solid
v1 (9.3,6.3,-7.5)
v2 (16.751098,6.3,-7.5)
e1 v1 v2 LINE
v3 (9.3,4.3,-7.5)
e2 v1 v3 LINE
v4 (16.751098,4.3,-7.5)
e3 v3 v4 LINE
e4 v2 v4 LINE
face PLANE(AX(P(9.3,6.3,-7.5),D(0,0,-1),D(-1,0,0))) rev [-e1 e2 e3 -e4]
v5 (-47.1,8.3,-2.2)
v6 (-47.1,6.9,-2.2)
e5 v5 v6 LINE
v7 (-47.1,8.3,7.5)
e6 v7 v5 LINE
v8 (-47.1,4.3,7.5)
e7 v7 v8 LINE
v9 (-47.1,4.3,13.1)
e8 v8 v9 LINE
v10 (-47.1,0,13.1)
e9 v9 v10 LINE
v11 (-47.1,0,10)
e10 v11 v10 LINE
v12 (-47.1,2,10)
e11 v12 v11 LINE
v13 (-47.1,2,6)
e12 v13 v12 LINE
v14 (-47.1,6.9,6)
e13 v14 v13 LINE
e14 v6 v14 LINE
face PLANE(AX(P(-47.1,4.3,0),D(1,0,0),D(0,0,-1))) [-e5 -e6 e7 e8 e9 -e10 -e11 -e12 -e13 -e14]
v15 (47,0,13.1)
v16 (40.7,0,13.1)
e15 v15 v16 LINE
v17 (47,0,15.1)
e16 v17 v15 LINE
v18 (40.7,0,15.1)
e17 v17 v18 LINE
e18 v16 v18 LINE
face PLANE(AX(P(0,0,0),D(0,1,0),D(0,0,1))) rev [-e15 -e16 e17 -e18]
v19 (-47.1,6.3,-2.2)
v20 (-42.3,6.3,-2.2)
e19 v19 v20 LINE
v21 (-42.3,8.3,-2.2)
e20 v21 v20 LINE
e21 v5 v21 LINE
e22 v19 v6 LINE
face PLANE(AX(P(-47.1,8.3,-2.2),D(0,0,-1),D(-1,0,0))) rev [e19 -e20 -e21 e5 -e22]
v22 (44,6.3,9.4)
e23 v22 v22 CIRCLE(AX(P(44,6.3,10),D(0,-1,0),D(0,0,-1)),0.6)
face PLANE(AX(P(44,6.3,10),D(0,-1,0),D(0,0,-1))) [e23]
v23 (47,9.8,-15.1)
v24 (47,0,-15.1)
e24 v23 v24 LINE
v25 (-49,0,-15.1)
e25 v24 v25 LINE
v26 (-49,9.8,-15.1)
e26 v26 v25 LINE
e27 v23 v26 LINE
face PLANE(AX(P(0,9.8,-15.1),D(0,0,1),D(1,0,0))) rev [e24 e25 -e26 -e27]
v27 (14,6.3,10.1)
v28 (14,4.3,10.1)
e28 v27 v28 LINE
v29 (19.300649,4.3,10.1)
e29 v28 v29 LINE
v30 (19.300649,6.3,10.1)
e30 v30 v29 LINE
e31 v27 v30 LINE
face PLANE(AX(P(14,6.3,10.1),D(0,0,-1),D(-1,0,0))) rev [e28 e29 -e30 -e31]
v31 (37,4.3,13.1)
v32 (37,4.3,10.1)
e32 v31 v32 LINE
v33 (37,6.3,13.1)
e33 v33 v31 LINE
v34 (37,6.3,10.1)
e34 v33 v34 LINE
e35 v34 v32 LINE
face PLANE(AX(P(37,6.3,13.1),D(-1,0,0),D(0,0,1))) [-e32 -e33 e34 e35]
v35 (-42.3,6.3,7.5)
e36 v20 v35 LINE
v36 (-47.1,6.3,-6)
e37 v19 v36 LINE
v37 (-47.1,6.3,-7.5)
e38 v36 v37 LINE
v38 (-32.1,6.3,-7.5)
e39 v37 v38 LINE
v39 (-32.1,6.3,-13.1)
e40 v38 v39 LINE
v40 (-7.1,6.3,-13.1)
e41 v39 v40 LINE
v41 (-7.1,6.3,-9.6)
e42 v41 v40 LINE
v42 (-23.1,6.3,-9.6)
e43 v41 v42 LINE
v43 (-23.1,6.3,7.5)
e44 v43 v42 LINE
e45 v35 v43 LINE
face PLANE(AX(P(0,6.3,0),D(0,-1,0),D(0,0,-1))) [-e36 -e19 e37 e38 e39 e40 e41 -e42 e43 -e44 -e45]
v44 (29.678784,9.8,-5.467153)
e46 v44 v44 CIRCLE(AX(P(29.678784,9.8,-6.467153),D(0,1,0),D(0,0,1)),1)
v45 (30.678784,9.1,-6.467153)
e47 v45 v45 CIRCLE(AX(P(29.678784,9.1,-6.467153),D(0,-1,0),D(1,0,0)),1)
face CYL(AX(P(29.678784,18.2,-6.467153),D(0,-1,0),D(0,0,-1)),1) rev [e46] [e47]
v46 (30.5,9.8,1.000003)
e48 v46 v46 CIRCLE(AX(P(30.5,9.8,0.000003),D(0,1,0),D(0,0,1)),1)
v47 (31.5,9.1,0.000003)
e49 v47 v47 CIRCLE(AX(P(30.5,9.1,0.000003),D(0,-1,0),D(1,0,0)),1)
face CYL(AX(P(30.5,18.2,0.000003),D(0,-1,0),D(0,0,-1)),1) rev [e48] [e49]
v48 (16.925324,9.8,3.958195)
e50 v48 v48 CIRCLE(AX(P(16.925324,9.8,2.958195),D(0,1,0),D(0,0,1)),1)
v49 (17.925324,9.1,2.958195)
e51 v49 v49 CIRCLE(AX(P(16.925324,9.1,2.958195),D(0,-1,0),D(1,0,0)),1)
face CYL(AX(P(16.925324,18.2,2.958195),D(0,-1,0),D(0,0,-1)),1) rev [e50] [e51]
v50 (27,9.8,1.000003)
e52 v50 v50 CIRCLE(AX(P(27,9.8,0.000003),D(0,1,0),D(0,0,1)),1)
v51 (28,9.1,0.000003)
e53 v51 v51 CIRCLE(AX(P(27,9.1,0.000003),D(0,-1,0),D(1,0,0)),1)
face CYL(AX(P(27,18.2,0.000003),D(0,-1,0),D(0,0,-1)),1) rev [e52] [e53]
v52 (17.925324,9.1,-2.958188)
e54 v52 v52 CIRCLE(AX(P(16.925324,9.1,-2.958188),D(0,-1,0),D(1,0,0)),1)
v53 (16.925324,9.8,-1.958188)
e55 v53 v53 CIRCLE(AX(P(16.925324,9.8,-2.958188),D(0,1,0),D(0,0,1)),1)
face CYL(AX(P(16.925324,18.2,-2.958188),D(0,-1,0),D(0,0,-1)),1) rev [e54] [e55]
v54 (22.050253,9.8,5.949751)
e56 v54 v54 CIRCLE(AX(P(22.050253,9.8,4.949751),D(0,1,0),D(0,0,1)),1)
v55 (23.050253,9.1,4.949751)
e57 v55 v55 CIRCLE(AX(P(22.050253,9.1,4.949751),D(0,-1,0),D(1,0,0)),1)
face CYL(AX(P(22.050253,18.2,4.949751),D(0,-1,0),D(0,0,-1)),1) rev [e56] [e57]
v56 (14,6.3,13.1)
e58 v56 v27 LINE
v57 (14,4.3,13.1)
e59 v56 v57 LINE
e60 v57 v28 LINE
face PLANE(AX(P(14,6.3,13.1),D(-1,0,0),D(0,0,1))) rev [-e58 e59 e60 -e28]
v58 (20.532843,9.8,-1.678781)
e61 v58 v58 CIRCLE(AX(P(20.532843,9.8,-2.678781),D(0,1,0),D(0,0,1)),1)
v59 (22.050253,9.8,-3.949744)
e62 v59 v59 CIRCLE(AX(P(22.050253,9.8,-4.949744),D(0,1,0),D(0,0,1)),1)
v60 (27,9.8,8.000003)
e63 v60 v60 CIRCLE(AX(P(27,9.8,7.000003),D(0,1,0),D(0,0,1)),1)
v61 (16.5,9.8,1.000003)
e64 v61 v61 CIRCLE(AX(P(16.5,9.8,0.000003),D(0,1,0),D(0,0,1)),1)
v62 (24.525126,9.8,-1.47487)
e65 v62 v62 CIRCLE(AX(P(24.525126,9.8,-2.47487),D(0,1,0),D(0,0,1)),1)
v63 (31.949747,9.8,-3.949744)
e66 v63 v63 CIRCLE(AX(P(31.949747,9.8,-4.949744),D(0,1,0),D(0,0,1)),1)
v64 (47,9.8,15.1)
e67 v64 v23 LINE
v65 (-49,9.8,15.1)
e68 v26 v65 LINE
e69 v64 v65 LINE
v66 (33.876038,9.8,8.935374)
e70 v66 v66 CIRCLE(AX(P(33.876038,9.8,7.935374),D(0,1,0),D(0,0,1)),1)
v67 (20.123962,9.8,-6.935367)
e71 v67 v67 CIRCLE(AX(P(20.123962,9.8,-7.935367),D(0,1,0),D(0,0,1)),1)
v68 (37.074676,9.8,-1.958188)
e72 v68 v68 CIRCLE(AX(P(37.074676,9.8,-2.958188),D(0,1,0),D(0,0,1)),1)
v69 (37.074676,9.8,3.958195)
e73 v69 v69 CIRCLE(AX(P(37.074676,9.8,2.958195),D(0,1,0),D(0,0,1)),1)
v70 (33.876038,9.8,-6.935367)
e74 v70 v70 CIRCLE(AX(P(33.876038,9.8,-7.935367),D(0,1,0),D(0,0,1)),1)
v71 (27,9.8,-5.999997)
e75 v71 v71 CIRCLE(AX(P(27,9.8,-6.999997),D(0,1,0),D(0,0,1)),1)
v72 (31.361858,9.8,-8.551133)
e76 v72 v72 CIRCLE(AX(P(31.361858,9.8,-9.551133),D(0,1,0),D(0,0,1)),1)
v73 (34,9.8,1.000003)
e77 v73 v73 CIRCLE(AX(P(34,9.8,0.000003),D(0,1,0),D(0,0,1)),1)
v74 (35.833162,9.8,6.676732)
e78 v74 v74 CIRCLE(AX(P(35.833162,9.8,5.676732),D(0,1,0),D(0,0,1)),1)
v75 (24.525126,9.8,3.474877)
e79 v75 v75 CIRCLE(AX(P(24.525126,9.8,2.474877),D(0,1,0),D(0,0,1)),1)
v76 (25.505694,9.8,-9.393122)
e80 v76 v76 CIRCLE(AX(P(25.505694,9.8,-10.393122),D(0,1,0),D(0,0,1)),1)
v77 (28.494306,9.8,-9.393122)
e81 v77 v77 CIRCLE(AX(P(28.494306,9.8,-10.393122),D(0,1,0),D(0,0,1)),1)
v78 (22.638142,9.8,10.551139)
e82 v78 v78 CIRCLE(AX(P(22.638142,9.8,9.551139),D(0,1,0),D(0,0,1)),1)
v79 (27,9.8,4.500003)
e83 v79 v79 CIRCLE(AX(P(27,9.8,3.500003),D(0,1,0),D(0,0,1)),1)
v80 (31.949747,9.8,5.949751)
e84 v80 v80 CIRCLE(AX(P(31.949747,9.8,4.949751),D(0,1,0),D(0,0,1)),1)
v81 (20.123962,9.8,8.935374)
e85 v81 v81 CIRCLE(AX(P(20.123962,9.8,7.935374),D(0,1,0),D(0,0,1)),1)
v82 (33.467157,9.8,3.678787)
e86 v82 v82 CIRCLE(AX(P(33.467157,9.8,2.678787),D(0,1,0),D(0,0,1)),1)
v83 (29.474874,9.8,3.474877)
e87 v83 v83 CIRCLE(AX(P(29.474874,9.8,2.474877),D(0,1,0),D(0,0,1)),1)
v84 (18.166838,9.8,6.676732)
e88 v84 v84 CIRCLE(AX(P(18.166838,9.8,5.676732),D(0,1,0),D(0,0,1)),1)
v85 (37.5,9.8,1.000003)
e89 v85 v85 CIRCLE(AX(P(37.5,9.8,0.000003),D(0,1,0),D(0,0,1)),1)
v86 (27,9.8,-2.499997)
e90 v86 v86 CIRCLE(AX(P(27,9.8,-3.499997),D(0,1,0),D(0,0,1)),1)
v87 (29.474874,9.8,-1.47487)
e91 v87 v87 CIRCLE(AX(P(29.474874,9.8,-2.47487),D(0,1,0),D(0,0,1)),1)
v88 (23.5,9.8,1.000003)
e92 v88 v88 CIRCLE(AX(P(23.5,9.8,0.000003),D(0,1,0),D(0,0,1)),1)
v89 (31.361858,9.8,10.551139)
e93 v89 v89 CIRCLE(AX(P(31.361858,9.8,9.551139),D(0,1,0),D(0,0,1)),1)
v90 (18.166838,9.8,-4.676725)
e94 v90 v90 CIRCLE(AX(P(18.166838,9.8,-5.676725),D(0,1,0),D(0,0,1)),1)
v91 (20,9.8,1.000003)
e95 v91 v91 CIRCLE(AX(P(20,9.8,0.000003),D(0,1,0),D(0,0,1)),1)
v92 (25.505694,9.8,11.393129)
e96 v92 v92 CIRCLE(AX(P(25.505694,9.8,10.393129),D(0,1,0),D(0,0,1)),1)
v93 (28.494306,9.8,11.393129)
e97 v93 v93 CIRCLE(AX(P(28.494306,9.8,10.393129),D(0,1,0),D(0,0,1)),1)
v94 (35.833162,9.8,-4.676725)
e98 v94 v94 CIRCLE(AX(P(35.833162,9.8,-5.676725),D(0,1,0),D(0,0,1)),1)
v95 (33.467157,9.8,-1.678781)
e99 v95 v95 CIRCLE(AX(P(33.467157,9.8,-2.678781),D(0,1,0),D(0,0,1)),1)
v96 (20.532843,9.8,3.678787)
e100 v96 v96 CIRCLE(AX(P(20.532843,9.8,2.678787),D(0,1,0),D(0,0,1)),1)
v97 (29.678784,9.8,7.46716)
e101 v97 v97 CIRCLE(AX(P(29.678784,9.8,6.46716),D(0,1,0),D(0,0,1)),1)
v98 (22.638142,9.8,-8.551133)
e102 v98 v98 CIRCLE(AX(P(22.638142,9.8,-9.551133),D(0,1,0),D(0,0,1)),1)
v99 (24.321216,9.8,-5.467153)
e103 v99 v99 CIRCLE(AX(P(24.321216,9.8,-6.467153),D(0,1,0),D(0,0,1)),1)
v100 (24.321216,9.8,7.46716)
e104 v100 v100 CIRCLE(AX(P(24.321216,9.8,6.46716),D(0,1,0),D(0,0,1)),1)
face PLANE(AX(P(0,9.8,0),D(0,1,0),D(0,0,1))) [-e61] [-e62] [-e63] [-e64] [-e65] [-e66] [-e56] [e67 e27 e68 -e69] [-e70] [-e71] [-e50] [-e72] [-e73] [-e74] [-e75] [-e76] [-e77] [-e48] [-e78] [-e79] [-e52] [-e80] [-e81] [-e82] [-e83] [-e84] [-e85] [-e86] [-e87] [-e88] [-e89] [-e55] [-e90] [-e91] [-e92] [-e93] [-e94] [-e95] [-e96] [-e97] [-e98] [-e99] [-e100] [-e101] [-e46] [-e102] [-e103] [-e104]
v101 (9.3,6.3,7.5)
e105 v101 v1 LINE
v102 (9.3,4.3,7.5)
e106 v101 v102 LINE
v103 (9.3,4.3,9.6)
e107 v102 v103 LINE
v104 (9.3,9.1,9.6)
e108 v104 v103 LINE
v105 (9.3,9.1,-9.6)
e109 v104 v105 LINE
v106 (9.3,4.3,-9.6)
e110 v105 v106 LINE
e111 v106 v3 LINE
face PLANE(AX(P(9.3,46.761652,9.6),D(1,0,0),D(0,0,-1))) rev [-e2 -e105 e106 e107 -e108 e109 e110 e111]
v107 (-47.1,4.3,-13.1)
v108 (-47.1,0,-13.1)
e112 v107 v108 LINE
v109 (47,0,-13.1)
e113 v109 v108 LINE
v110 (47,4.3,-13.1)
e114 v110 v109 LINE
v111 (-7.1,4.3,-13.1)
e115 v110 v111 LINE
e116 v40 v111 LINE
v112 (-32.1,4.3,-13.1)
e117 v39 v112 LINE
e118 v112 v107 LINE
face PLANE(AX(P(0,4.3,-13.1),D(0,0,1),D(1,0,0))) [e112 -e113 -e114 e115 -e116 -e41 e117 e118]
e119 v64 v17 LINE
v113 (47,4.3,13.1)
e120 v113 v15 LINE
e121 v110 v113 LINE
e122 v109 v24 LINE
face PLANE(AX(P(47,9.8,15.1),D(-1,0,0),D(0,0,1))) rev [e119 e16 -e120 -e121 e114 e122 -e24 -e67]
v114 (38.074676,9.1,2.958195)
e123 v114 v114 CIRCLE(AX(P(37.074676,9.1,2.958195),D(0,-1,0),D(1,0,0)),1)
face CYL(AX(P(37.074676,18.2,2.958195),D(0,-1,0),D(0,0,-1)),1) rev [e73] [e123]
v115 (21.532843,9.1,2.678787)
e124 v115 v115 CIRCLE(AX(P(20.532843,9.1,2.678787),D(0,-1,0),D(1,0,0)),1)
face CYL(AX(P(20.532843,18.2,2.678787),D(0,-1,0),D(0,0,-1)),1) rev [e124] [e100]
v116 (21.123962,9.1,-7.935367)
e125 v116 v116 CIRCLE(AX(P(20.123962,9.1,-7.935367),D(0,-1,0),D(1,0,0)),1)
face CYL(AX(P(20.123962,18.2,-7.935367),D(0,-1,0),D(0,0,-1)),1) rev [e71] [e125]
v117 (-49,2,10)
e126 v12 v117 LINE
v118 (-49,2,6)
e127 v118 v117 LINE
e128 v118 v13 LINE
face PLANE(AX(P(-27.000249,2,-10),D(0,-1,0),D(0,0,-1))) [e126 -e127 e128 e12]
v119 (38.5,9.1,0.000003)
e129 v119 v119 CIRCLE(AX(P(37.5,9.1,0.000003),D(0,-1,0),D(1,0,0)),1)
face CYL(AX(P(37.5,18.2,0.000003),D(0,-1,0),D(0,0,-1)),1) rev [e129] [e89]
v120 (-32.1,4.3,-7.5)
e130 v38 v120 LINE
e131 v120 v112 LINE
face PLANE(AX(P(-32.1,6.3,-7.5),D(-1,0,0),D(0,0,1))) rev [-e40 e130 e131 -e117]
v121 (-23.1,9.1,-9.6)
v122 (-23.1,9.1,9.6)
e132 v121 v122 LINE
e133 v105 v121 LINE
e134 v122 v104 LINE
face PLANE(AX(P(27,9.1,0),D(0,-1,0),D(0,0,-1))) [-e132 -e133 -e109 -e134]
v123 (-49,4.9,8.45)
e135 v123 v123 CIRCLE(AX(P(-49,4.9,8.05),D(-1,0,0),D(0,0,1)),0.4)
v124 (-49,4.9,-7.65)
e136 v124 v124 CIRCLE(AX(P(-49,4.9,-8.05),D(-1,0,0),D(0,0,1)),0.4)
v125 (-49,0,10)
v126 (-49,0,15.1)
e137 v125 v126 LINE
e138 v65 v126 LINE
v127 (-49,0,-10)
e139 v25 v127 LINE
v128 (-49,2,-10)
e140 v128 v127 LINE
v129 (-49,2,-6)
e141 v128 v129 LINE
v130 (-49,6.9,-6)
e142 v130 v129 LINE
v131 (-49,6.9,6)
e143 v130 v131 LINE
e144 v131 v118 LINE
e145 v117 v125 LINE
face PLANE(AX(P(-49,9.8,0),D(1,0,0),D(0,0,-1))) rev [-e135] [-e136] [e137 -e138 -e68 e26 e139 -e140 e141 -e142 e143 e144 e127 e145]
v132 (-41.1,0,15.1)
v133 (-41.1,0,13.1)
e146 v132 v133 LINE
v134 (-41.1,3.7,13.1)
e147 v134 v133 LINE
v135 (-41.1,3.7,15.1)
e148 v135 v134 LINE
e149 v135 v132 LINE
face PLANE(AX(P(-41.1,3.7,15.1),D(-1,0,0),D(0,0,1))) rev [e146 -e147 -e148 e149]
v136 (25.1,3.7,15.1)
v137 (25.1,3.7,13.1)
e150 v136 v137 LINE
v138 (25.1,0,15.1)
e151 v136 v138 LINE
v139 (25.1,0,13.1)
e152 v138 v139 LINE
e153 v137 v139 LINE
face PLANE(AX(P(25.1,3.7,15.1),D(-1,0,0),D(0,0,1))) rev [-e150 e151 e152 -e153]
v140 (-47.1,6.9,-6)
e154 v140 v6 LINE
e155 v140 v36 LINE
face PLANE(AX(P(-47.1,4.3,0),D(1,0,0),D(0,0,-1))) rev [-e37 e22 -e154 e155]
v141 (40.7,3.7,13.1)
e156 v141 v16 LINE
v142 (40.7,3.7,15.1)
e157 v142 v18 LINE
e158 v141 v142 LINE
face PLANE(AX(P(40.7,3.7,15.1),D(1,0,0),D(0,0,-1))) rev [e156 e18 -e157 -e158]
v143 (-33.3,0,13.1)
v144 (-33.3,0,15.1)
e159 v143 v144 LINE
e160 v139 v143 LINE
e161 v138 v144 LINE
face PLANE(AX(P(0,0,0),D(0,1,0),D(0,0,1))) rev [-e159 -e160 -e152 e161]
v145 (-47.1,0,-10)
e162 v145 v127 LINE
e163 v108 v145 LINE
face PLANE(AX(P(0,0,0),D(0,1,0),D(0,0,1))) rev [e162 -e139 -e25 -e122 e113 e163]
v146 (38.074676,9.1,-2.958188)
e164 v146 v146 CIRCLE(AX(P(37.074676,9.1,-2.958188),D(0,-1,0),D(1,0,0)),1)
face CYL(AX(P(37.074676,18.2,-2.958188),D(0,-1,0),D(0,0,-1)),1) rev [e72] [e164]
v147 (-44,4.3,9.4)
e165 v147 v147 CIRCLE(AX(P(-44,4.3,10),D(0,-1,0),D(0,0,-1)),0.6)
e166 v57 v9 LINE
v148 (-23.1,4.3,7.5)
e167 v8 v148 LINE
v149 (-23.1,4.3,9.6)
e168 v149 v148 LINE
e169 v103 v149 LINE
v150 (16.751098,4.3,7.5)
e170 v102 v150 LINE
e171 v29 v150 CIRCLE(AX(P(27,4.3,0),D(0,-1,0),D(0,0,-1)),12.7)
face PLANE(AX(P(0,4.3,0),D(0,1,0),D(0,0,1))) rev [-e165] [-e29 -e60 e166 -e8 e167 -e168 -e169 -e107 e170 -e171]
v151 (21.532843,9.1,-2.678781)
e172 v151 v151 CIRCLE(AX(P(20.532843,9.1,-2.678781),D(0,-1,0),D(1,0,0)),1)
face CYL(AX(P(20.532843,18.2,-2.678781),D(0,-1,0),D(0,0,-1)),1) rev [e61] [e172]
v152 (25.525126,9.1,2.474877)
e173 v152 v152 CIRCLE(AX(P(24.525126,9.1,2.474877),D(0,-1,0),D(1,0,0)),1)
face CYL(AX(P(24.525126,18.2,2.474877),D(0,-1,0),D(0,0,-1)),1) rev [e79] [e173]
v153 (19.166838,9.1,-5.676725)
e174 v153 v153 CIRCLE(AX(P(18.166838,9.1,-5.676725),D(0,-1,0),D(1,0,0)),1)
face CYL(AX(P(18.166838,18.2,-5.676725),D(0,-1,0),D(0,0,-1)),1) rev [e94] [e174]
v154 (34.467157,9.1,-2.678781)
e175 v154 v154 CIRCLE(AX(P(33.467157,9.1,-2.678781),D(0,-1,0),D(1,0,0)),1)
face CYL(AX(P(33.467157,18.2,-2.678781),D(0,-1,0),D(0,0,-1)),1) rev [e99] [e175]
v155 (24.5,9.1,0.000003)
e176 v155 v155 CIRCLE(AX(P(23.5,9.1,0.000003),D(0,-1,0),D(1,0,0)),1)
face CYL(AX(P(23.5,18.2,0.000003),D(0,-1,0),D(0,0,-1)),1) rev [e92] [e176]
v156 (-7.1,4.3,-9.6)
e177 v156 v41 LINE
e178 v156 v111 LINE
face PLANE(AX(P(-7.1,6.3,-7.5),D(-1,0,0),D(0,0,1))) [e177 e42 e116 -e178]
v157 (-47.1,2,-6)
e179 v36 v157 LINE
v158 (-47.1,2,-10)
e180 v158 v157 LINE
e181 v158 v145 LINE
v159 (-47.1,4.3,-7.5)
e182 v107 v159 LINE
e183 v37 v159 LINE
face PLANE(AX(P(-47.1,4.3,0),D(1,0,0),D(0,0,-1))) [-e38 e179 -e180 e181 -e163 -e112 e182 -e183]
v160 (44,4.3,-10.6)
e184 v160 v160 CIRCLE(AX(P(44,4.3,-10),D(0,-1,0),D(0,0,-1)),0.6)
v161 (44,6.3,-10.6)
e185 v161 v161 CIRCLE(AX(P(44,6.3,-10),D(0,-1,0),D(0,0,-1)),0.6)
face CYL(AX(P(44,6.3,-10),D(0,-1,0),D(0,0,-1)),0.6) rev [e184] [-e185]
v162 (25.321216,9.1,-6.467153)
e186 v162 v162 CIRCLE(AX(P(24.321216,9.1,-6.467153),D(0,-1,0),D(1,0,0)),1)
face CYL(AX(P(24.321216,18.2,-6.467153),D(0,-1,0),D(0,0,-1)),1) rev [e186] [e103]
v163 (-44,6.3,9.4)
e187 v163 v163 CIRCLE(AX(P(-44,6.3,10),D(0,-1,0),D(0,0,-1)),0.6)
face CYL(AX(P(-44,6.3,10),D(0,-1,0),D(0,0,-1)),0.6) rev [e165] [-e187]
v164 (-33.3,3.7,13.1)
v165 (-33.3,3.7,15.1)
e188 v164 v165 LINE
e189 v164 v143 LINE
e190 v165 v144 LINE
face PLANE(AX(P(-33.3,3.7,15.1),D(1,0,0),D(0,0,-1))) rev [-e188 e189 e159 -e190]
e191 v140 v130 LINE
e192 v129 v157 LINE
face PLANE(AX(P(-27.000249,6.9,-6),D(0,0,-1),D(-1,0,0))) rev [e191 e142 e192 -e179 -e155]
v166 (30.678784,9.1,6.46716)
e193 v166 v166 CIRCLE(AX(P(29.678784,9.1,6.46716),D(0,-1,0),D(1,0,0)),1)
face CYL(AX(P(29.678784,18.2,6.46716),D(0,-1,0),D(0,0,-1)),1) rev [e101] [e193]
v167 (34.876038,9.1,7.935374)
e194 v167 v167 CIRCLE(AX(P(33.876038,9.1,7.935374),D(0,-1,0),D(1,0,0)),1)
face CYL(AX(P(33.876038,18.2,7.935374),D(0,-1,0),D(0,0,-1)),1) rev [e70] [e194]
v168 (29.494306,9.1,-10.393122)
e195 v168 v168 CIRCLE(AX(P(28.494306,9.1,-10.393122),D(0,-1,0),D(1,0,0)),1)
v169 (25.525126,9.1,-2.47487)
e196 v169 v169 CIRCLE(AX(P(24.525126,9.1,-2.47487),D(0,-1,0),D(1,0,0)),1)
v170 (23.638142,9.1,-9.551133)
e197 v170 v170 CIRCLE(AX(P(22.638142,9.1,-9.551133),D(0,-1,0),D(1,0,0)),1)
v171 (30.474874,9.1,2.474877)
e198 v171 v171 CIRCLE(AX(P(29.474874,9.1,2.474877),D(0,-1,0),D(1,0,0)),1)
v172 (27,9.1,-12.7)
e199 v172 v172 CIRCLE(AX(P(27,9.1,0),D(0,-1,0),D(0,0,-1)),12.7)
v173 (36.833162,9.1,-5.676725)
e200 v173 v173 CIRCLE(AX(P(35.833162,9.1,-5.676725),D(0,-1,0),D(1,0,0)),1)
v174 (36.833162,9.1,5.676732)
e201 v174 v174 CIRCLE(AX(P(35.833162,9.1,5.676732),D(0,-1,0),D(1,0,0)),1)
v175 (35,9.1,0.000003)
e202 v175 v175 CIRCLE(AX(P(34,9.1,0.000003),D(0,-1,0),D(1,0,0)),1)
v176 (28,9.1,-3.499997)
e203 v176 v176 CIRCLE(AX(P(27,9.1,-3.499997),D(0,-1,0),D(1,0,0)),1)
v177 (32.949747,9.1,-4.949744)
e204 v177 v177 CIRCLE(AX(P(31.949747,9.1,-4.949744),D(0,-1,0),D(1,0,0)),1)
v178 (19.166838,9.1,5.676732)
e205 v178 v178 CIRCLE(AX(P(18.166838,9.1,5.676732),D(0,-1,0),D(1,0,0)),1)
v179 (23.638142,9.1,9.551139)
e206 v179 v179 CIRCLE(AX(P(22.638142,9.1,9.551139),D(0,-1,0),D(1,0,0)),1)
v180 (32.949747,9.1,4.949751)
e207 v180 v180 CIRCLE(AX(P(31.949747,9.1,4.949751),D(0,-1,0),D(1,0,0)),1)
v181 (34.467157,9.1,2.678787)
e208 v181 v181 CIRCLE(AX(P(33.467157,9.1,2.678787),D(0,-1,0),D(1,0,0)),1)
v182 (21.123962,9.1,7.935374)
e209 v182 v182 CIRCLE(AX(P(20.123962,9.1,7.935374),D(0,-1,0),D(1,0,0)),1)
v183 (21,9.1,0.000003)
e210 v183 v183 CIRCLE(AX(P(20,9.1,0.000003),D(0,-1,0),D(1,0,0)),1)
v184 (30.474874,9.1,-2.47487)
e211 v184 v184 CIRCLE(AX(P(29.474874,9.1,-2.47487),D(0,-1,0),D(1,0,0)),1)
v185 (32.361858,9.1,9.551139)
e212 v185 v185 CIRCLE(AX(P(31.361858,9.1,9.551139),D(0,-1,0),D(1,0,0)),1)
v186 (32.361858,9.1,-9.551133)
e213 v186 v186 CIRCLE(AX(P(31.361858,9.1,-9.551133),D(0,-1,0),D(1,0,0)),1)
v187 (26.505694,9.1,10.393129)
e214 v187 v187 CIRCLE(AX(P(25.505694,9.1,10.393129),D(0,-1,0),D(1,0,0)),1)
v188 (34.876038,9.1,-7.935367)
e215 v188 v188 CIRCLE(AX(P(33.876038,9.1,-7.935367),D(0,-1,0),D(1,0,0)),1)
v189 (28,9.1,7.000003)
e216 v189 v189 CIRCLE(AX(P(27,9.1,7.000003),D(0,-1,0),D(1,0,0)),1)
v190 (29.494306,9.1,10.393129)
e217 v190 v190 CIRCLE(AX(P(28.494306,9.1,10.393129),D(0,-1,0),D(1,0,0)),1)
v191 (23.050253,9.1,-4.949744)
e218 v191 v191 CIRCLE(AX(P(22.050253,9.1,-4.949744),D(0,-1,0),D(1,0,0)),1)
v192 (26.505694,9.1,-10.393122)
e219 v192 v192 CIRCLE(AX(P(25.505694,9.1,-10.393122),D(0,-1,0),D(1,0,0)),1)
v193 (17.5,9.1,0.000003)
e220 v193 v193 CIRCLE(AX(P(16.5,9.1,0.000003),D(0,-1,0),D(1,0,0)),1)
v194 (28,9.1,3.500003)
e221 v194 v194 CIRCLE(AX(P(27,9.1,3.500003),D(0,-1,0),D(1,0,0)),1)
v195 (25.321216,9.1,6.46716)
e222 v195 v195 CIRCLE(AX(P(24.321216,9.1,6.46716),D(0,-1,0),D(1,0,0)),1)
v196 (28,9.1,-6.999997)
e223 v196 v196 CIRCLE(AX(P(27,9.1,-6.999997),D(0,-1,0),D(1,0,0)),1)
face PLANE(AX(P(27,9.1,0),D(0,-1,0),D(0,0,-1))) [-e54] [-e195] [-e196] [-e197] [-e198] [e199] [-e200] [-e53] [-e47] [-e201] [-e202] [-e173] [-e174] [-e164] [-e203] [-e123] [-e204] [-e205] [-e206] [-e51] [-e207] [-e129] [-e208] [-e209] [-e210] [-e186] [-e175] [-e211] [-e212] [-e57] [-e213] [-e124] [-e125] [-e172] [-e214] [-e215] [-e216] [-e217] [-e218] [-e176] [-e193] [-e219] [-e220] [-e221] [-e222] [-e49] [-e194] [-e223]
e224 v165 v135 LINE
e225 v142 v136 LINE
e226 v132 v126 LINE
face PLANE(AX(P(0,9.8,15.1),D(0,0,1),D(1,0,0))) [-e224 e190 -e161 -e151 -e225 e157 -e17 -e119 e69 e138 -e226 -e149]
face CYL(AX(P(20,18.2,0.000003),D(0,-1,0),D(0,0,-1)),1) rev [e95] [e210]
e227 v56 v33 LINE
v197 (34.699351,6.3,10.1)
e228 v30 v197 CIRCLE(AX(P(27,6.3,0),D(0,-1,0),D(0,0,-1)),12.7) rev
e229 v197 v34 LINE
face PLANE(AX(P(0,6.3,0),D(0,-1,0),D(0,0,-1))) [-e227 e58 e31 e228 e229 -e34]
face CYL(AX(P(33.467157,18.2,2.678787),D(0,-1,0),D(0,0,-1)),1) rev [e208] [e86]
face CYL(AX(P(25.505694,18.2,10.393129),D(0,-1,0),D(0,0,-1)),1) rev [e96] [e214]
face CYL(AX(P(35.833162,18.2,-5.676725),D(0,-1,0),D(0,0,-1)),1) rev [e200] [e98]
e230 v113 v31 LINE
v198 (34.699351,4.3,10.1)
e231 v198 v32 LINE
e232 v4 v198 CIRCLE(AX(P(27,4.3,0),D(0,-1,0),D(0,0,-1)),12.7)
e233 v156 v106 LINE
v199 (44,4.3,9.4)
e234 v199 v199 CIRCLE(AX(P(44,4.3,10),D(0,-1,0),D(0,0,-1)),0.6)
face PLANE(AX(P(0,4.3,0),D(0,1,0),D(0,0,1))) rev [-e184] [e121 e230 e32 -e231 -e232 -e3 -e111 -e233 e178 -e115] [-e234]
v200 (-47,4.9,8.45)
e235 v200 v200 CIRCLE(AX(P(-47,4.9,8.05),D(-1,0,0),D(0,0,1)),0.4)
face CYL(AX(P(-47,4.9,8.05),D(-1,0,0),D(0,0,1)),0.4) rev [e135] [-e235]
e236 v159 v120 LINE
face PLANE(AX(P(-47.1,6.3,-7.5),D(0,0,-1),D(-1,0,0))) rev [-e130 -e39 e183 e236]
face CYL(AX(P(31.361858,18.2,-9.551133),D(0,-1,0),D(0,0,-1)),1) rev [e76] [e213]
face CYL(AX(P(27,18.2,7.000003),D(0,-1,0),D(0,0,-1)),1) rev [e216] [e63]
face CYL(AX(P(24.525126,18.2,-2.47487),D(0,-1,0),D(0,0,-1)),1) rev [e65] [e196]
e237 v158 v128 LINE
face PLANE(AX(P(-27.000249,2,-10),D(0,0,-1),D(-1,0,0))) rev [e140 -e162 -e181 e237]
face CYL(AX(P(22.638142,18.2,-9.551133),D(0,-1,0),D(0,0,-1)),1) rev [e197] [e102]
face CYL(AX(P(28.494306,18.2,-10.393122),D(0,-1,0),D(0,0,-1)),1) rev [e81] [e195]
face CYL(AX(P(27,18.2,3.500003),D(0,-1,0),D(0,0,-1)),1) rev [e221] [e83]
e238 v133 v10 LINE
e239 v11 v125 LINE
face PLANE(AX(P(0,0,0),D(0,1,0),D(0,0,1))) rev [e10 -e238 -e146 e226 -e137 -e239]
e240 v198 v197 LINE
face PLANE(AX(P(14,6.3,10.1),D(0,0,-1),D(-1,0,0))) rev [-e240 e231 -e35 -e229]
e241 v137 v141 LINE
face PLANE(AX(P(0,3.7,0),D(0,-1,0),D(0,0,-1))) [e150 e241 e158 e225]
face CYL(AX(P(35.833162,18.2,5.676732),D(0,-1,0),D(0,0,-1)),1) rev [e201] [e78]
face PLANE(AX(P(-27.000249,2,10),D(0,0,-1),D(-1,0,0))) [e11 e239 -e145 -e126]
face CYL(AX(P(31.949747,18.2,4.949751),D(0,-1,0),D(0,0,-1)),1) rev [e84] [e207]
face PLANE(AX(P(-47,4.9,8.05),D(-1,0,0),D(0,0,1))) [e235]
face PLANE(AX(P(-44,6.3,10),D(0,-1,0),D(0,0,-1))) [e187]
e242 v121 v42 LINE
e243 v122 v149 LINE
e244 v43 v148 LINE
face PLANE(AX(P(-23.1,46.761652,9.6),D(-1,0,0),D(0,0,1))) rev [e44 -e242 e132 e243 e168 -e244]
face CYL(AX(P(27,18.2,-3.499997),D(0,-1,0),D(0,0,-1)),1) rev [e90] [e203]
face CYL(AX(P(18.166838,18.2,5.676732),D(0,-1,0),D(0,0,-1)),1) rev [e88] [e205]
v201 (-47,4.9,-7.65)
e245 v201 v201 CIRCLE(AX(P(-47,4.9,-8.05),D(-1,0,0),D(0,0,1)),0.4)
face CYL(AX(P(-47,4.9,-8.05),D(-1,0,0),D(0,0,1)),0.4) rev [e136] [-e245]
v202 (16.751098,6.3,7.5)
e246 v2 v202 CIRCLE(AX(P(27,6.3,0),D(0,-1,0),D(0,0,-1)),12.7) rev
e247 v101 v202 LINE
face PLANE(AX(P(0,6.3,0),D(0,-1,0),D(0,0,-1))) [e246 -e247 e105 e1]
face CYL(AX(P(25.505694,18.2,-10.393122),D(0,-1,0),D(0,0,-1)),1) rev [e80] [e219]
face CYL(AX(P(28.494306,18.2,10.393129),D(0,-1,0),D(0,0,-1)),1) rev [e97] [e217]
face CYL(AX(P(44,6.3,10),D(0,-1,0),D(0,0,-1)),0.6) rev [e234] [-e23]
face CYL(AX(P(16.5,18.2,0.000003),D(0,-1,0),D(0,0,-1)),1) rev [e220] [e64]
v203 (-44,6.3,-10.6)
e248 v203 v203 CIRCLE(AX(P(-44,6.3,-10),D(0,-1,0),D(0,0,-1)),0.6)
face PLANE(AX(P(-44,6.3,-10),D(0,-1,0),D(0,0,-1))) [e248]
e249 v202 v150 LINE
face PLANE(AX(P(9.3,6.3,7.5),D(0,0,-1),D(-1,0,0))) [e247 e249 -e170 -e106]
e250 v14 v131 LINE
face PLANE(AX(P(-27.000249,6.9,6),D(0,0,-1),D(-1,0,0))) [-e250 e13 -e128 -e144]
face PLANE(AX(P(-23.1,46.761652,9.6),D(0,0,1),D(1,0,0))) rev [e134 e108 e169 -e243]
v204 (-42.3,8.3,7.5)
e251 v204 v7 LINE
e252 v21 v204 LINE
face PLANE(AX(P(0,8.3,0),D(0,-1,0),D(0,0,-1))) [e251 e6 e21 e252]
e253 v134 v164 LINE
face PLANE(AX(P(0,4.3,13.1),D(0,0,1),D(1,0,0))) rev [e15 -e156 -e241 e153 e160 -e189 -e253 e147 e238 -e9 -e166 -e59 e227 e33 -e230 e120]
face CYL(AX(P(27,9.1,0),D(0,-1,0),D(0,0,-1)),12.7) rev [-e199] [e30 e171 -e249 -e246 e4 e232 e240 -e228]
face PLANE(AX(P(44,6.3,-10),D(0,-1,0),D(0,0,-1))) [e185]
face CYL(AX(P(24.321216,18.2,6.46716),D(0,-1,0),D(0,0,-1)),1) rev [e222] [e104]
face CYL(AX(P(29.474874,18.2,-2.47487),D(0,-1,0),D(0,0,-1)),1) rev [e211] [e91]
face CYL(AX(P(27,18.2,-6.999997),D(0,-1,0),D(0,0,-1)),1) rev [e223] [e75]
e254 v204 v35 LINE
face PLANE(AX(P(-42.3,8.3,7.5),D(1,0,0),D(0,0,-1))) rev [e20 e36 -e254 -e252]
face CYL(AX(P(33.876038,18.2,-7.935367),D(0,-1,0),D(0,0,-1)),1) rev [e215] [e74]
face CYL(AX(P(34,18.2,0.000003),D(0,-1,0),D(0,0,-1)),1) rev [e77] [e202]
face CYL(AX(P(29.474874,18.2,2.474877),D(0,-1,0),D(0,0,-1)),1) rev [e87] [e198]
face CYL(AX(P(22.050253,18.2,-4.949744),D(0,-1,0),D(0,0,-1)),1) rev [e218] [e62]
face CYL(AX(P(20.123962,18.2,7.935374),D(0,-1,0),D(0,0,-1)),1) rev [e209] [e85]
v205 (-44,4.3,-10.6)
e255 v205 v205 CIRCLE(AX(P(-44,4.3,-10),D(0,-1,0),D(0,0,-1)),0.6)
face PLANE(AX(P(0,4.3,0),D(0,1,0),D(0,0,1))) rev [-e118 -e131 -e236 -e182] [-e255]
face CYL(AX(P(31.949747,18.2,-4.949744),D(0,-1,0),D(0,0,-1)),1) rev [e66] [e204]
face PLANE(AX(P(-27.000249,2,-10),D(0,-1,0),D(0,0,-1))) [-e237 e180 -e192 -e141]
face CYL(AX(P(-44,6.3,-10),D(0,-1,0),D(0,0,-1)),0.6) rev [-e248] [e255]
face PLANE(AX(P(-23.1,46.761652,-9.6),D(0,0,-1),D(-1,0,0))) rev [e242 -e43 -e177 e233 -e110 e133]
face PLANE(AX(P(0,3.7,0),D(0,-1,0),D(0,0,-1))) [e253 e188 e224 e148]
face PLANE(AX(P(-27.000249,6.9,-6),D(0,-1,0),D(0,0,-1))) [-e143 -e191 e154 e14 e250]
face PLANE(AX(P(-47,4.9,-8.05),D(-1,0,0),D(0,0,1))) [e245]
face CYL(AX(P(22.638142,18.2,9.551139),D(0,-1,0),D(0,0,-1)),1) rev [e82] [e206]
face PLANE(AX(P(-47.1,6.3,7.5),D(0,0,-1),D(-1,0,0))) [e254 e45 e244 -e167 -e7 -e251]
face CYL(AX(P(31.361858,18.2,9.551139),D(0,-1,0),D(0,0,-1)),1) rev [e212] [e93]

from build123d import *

# Parameters (mm, degrees)
SKETCH_1_W           = 96
SKETCH_1_H           = 30.2
EXTRUDE_1_DEPTH      = 9.8
SKETCH_1_8_W         = 0.1
SKETCH_1_8_H         = 26.2
SKETCH_1_8_W_2       = 94
CUT_EXTRUDE_2_DEPTH  = 4.3
SKETCH_2_R           = 12.7
CUT_EXTRUDE_3_DEPTH  = 4.8
SKETCH_3_W           = 32.4
SKETCH_3_H           = 19.2
CUT_EXTRUDE_4_DEPTH  = 4.8
SKETCH_4_R           = 0.6
CUT_EXTRUDE_5_DEPTH  = 2
SKETCH_5_W           = 7.8
SKETCH_5_H           = 2
SKETCH_5_W_2         = 15.6
CUT_EXTRUDE_6_DEPTH  = 3.7
SKETCH_6_R           = 0.4
CUT_EXTRUDE_7_DEPTH  = 2
SKETCH_7_W           = 12
SKETCH_7_H           = 6.9
SKETCH_7_W_2         = 20
SKETCH_7_H_2         = 2
CUT_EXTRUDE_9_DEPTH  = 1.9
SKETCH_8_W           = 4.8
SKETCH_8_H           = 9.7
CUT_EXTRUDE_10_DEPTH = 2
OTHER_START          = 9.1
OTHER_1_OUTLINE_R    = 1
OTHER_1_DEPTH        = 0.7


# Read off the part's stored shape, not the designer's step: 填充阵列1
with BuildPart() as part:
    # 草图1 → 凸台-拉伸1 (new body)
    with BuildSketch(Plane(origin=(0, 0, 0), x_dir=(1, 0, 0), z_dir=(0, 1, 0))):
        with Locations((-1, 0)):
            Rectangle(SKETCH_1_W, SKETCH_1_H)
    extrude(amount=EXTRUDE_1_DEPTH)

    # 草图1<8> → 切除-拉伸2 (cut)
    with BuildSketch(Plane(origin=(0, 0, 0), x_dir=(1, 0, 0), z_dir=(0, 1, 0))):
        with Locations((-47.05, 0)):
            Rectangle(SKETCH_1_8_W, SKETCH_1_8_H)
        Rectangle(SKETCH_1_8_W_2, SKETCH_1_8_H)
    extrude(amount=CUT_EXTRUDE_2_DEPTH, mode=Mode.SUBTRACT)

    # 草图2 → 切除-拉伸3 (cut)
    with BuildSketch(Plane(origin=(0, 4.3, 0), x_dir=(-1, 0, 0), z_dir=(0, -1, 0))):
        with Locations(Location((-27, 0, 0), (0, 0, 90))):
            Circle(SKETCH_2_R)
    extrude(amount=-CUT_EXTRUDE_3_DEPTH, mode=Mode.SUBTRACT)

    # 草图3 → 切除-拉伸4 (cut)
    with BuildSketch(Plane.XZ.offset(-4.3)):
        with Locations((-6.9, 0)):
            Rectangle(SKETCH_3_W, SKETCH_3_H)
    extrude(amount=-CUT_EXTRUDE_4_DEPTH, mode=Mode.SUBTRACT)

    # 草图4 → 切除-拉伸5 (cut)
    with BuildSketch(Plane.XZ.offset(-4.3)):
        Polygon((-23.1, 7.5), (-47.1, 7.5), (-47.1, -7.5), (-32.1, -7.5), (-32.1, -13.1), (-7.1, -13.1), (-7.1, -9.6), (-23.1, -9.6), align=None)
        with BuildLine():
            Line((37, 13.1), (14, 13.1))
            Line((14, 13.1), (14, 10.1))
            Line((14, 10.1), (19.300649378, 10.1))
            ThreePointArc((19.300649378, 10.1), (27, 12.7), (34.699350622, 10.1))
            Line((34.699350622, 10.1), (37, 10.1))
            Line((37, 10.1), (37, 13.1))
        make_face()
        with BuildLine():
            Line((16.75109762, 7.5), (9.3, 7.5))
            Line((9.3, 7.5), (9.3, -7.5))
            Line((9.3, -7.5), (16.75109762, -7.5))
            ThreePointArc((16.75109762, -7.5), (14.3, 0), (16.75109762, 7.5))
        make_face()
        with Locations(Location((-44, 10, 0), (0, 0, 270))):
            Circle(SKETCH_4_R)
        with Locations(Location((-44, -10, 0), (0, 0, 270))):
            Circle(SKETCH_4_R)
        with Locations(Location((44, 10, 0), (0, 0, 270))):
            Circle(SKETCH_4_R)
        with Locations(Location((44, -10, 0), (0, 0, 270))):
            Circle(SKETCH_4_R)
    extrude(amount=-CUT_EXTRUDE_5_DEPTH, mode=Mode.SUBTRACT)

    # 草图5 → 切除-拉伸6 (cut)
    with BuildSketch(Plane.XZ):
        with Locations((-37.2, 14.1)):
            Rectangle(SKETCH_5_W, SKETCH_5_H)
        with Locations((32.9, 14.1)):
            Rectangle(SKETCH_5_W_2, SKETCH_5_H)
    extrude(amount=-CUT_EXTRUDE_6_DEPTH, mode=Mode.SUBTRACT)

    # 草图6 → 切除-拉伸7 (cut)
    with BuildSketch(Plane.ZY.offset(49)):
        with Locations((-8.05, 4.9)):
            Circle(SKETCH_6_R)
        with Locations((8.05, 4.9)):
            Circle(SKETCH_6_R)
    extrude(amount=-CUT_EXTRUDE_7_DEPTH, mode=Mode.SUBTRACT)

    # 草图7 → 切除-拉伸9 (cut)
    with BuildSketch(Plane.ZY.offset(49)):
        with Locations((0, 3.45)):
            Rectangle(SKETCH_7_W, SKETCH_7_H)
        with Locations((0, 1)):
            Rectangle(SKETCH_7_W_2, SKETCH_7_H_2)
    extrude(amount=-CUT_EXTRUDE_9_DEPTH, mode=Mode.SUBTRACT)

    # 草图8 → 切除-拉伸10 (cut)
    with BuildSketch(Plane.XZ.offset(-6.3)):
        with Locations((-44.7, 2.65)):
            Rectangle(SKETCH_8_W, SKETCH_8_H)
    extrude(amount=-CUT_EXTRUDE_10_DEPTH, mode=Mode.SUBTRACT)

    # 填充阵列1 outline → 填充阵列1 (cut)
    with BuildSketch(Plane(origin=(0, 0, 0), x_dir=(1, 0, 0), z_dir=(0, 1, 0)).offset(OTHER_START)):
        with Locations((27, -3.369e-06)):
            Circle(OTHER_1_OUTLINE_R)
        with Locations((22.050252532, 4.949744099)):
            Circle(OTHER_1_OUTLINE_R)
        with Locations((33.876037706, 7.935367161)):
            Circle(OTHER_1_OUTLINE_R)
        with Locations((20.532843272, 2.678780657)):
            Circle(OTHER_1_OUTLINE_R)
        with Locations((31.361857637, 9.551132582)):
            Circle(OTHER_1_OUTLINE_R)
        with Locations((27, 6.999996631)):
            Circle(OTHER_1_OUTLINE_R)
        with Locations((37.074676223, 2.958188477)):
            Circle(OTHER_1_OUTLINE_R)
        with Locations((24.321215973, 6.467153358)):
            Circle(OTHER_1_OUTLINE_R)
        with Locations((35.833162095, 5.676725214)):
            Circle(OTHER_1_OUTLINE_R)
        with Locations((28.494305802, 10.39312177)):
            Circle(OTHER_1_OUTLINE_R)
        with Locations((25.505694198, 10.39312177)):
            Circle(OTHER_1_OUTLINE_R)
        with Locations((22.638142363, 9.551132582)):
            Circle(OTHER_1_OUTLINE_R)
        with Locations((20.123962294, 7.935367161)):
            Circle(OTHER_1_OUTLINE_R)
        with Locations((18.166837905, 5.676725214)):
            Circle(OTHER_1_OUTLINE_R)
        with Locations((16.925323777, 2.958188477)):
            Circle(OTHER_1_OUTLINE_R)
        with Locations((20.123962294, -7.9353739)):
            Circle(OTHER_1_OUTLINE_R)
        with Locations((24.321215973, -6.467160097)):
            Circle(OTHER_1_OUTLINE_R)
        with Locations((29.474873734, -2.474877104)):
            Circle(OTHER_1_OUTLINE_R)
        with Locations((18.166837905, -5.676731953)):
            Circle(OTHER_1_OUTLINE_R)
        with Locations((29.474873734, 2.474870365)):
            Circle(OTHER_1_OUTLINE_R)
        with Locations((22.638142363, -9.551139321)):
            Circle(OTHER_1_OUTLINE_R)
        with Locations((27, -7.000003369)):
            Circle(OTHER_1_OUTLINE_R)
        with Locations((30.5, -3.369e-06)):
            Circle(OTHER_1_OUTLINE_R)
        with Locations((24.525126266, -2.474877104)):
            Circle(OTHER_1_OUTLINE_R)
        with Locations((16.5, -3.369e-06)):
            Circle(OTHER_1_OUTLINE_R)
        with Locations((20, -3.369e-06)):
            Circle(OTHER_1_OUTLINE_R)
        with Locations((23.5, -3.369e-06)):
            Circle(OTHER_1_OUTLINE_R)
        with Locations((22.050252532, -4.949750838)):
            Circle(OTHER_1_OUTLINE_R)
        with Locations((27, -3.500003369)):
            Circle(OTHER_1_OUTLINE_R)
        with Locations((16.925323777, -2.958195216)):
            Circle(OTHER_1_OUTLINE_R)
        with Locations((20.532843272, -2.678787396)):
            Circle(OTHER_1_OUTLINE_R)
        with Locations((35.833162095, -5.676731953)):
            Circle(OTHER_1_OUTLINE_R)
        with Locations((33.467156728, 2.678780657)):
            Circle(OTHER_1_OUTLINE_R)
        with Locations((33.876037706, -7.9353739)):
            Circle(OTHER_1_OUTLINE_R)
        with Locations((34, -3.369e-06)):
            Circle(OTHER_1_OUTLINE_R)
        with Locations((37.5, -3.369e-06)):
            Circle(OTHER_1_OUTLINE_R)
        with Locations((29.678784027, 6.467153358)):
            Circle(OTHER_1_OUTLINE_R)
        with Locations((37.074676223, -2.958195216)):
            Circle(OTHER_1_OUTLINE_R)
        with Locations((31.949747468, 4.949744099)):
            Circle(OTHER_1_OUTLINE_R)
        with Locations((31.949747468, -4.949750838)):
            Circle(OTHER_1_OUTLINE_R)
        with Locations((27, 3.499996631)):
            Circle(OTHER_1_OUTLINE_R)
        with Locations((25.505694198, -10.393128509)):
            Circle(OTHER_1_OUTLINE_R)
        with Locations((29.678784027, -6.467160097)):
            Circle(OTHER_1_OUTLINE_R)
        with Locations((28.494305802, -10.393128509)):
            Circle(OTHER_1_OUTLINE_R)
        with Locations((24.525126266, 2.474870365)):
            Circle(OTHER_1_OUTLINE_R)
        with Locations((33.467156728, -2.678787396)):
            Circle(OTHER_1_OUTLINE_R)
        with Locations((31.361857637, -9.551139321)):
            Circle(OTHER_1_OUTLINE_R)
    extrude(amount=OTHER_1_DEPTH, mode=Mode.SUBTRACT)


solid = part.part
